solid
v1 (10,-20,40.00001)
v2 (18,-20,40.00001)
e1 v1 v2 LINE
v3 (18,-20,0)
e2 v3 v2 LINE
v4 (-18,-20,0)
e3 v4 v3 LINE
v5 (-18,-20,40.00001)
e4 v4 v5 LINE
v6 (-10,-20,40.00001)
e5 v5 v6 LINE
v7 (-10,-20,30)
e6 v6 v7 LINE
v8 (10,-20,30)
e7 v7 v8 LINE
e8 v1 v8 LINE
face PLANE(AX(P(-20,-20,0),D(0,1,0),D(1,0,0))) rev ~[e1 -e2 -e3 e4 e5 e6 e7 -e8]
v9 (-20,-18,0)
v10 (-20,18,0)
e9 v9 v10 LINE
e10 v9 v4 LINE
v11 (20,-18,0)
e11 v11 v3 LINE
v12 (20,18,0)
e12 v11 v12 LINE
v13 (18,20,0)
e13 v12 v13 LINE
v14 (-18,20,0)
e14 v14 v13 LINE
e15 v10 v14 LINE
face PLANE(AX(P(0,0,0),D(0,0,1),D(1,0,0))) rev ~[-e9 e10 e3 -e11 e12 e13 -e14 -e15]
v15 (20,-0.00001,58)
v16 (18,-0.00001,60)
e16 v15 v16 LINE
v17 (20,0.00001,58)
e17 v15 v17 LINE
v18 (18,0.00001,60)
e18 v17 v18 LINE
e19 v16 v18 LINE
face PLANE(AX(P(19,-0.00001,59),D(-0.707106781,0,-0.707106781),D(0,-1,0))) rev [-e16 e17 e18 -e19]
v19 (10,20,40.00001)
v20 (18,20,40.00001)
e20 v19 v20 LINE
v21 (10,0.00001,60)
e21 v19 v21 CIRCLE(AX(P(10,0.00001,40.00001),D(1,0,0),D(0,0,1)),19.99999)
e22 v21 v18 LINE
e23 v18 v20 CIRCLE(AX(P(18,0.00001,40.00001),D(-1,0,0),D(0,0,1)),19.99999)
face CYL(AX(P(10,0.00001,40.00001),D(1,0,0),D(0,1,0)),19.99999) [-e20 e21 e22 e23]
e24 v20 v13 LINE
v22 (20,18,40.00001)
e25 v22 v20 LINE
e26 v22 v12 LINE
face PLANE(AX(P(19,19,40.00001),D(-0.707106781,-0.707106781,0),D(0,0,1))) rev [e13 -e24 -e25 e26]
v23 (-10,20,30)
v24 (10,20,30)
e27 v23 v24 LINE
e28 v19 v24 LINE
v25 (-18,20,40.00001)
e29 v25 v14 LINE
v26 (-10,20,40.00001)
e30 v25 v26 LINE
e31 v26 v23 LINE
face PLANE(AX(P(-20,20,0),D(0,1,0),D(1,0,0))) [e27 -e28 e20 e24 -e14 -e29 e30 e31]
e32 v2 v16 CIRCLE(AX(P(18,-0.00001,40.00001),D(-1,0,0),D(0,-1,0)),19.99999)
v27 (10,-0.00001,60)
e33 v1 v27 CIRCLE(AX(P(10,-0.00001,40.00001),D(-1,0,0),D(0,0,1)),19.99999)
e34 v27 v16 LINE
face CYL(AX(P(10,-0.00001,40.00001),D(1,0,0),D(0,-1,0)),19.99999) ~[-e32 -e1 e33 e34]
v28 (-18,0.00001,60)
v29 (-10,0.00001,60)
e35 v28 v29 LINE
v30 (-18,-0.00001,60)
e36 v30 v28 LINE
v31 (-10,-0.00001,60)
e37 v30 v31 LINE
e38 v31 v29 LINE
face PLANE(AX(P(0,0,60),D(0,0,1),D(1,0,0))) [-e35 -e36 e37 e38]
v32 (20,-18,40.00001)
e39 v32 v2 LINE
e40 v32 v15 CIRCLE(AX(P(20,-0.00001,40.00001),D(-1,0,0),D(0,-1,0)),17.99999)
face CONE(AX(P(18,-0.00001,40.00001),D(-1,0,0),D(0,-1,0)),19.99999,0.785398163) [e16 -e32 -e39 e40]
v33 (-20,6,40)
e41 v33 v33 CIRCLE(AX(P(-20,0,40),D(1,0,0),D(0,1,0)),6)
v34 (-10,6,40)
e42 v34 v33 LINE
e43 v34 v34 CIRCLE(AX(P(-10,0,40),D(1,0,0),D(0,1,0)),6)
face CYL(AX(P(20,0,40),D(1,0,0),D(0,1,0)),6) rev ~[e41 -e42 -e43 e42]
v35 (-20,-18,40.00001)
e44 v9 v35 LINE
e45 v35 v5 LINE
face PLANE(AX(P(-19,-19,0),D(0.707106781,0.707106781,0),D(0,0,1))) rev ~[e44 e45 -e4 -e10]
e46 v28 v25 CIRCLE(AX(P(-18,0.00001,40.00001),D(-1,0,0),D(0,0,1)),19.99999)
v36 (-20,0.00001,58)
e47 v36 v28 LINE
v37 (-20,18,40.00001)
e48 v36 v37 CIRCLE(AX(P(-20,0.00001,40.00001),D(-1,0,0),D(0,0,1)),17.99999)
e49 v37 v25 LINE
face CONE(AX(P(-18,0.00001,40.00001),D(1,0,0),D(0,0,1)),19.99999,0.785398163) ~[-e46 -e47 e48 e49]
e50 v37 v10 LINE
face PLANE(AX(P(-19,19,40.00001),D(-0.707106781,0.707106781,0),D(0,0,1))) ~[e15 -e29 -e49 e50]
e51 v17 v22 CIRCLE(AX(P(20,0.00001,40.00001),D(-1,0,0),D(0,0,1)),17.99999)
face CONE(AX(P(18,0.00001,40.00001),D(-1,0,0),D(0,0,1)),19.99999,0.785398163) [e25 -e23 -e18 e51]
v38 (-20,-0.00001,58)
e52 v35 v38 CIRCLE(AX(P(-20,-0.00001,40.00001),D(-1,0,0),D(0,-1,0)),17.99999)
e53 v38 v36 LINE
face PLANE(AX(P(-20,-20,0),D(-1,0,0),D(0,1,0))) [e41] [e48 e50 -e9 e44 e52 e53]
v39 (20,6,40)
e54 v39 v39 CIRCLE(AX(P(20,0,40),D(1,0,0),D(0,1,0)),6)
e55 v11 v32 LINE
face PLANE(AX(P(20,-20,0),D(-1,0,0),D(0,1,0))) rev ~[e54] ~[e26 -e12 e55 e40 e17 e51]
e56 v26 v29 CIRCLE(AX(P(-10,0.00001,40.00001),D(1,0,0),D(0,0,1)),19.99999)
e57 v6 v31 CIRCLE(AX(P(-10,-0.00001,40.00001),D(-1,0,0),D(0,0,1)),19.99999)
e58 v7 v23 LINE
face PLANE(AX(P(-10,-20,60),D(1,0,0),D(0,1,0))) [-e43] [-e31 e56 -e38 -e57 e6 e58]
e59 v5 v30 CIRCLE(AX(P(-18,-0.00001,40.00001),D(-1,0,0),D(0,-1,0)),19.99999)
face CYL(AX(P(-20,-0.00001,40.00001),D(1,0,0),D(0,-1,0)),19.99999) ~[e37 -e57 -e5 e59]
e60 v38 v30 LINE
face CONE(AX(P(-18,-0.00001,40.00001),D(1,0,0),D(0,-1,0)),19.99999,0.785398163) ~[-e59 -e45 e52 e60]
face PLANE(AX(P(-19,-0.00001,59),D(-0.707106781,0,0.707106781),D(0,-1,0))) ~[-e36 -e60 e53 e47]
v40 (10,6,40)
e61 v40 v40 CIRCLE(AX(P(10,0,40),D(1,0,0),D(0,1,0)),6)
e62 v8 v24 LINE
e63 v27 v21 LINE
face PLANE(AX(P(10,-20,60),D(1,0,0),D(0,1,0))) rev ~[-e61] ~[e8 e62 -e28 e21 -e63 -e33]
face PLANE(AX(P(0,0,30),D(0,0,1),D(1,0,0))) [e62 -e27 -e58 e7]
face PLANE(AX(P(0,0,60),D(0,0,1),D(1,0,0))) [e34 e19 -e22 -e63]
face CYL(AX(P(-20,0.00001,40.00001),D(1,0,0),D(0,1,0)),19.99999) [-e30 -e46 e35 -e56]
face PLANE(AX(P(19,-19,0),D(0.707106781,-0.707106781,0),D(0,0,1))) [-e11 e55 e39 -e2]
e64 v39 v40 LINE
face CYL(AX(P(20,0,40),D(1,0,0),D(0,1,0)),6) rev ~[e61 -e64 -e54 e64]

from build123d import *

# Parameters (mm, degrees)
F0_W          = 40
F0_H          = 40
F1_DEPTH      = 60
F2_W          = 20
F2_H          = 40
F3_DEPTH      = 30
F4_R          = 19.99999
F5_SIZE       = 2
F6_R          = 6
F7_DEPTH      = 56.6
F7_DEPTH_BACK = 25


# Not quite as in the source:
# - a fillet or chamfer is up to 0.001 mm smaller than in the source, because OpenCascade refuses the exact size


with BuildPart() as f1:
    # F0 (on Top) → F1 (new body)
    with BuildSketch(Plane.XY):
        Rectangle(F0_W, F0_H)
    extrude(amount=F1_DEPTH)

    # F2 (on face) → F3 (cut)
    with BuildSketch(Plane.XY.offset(60)):
        Rectangle(F2_W, F2_H)
    extrude(amount=-F3_DEPTH, mode=Mode.SUBTRACT)

    # F4 (radius 20 in the source; OpenCascade refuses exactly that, so slightly less here)
    f4_edges = [f1.edges().sort_by_distance(p)[0] for p in [
        (15, -20, 60),
        (-15, -20, 60),
        (15, 20, 60),
        (-15, 20, 60),
    ]]
    fillet(f4_edges, radius=F4_R)

    # F5
    f5_edges = [f1.edges().sort_by_distance(p)[0] for p in [
        (-20, -20, 20.000005),
        (-20, -14.142139, 54.142139),
        (20, -14.142139, 54.142139),
    ]]
    chamfer(f5_edges, length=F5_SIZE)

    # F6 (on face) → F7 (cut, two sides)
    with BuildSketch(Plane.YZ.offset(20)) as f7_sk:
        with Locations((0, 40)):
            Circle(F6_R)
    extrude(amount=-F7_DEPTH, mode=Mode.SUBTRACT)
    extrude(f7_sk.sketch, amount=F7_DEPTH_BACK, mode=Mode.SUBTRACT)


solid = f1.part
